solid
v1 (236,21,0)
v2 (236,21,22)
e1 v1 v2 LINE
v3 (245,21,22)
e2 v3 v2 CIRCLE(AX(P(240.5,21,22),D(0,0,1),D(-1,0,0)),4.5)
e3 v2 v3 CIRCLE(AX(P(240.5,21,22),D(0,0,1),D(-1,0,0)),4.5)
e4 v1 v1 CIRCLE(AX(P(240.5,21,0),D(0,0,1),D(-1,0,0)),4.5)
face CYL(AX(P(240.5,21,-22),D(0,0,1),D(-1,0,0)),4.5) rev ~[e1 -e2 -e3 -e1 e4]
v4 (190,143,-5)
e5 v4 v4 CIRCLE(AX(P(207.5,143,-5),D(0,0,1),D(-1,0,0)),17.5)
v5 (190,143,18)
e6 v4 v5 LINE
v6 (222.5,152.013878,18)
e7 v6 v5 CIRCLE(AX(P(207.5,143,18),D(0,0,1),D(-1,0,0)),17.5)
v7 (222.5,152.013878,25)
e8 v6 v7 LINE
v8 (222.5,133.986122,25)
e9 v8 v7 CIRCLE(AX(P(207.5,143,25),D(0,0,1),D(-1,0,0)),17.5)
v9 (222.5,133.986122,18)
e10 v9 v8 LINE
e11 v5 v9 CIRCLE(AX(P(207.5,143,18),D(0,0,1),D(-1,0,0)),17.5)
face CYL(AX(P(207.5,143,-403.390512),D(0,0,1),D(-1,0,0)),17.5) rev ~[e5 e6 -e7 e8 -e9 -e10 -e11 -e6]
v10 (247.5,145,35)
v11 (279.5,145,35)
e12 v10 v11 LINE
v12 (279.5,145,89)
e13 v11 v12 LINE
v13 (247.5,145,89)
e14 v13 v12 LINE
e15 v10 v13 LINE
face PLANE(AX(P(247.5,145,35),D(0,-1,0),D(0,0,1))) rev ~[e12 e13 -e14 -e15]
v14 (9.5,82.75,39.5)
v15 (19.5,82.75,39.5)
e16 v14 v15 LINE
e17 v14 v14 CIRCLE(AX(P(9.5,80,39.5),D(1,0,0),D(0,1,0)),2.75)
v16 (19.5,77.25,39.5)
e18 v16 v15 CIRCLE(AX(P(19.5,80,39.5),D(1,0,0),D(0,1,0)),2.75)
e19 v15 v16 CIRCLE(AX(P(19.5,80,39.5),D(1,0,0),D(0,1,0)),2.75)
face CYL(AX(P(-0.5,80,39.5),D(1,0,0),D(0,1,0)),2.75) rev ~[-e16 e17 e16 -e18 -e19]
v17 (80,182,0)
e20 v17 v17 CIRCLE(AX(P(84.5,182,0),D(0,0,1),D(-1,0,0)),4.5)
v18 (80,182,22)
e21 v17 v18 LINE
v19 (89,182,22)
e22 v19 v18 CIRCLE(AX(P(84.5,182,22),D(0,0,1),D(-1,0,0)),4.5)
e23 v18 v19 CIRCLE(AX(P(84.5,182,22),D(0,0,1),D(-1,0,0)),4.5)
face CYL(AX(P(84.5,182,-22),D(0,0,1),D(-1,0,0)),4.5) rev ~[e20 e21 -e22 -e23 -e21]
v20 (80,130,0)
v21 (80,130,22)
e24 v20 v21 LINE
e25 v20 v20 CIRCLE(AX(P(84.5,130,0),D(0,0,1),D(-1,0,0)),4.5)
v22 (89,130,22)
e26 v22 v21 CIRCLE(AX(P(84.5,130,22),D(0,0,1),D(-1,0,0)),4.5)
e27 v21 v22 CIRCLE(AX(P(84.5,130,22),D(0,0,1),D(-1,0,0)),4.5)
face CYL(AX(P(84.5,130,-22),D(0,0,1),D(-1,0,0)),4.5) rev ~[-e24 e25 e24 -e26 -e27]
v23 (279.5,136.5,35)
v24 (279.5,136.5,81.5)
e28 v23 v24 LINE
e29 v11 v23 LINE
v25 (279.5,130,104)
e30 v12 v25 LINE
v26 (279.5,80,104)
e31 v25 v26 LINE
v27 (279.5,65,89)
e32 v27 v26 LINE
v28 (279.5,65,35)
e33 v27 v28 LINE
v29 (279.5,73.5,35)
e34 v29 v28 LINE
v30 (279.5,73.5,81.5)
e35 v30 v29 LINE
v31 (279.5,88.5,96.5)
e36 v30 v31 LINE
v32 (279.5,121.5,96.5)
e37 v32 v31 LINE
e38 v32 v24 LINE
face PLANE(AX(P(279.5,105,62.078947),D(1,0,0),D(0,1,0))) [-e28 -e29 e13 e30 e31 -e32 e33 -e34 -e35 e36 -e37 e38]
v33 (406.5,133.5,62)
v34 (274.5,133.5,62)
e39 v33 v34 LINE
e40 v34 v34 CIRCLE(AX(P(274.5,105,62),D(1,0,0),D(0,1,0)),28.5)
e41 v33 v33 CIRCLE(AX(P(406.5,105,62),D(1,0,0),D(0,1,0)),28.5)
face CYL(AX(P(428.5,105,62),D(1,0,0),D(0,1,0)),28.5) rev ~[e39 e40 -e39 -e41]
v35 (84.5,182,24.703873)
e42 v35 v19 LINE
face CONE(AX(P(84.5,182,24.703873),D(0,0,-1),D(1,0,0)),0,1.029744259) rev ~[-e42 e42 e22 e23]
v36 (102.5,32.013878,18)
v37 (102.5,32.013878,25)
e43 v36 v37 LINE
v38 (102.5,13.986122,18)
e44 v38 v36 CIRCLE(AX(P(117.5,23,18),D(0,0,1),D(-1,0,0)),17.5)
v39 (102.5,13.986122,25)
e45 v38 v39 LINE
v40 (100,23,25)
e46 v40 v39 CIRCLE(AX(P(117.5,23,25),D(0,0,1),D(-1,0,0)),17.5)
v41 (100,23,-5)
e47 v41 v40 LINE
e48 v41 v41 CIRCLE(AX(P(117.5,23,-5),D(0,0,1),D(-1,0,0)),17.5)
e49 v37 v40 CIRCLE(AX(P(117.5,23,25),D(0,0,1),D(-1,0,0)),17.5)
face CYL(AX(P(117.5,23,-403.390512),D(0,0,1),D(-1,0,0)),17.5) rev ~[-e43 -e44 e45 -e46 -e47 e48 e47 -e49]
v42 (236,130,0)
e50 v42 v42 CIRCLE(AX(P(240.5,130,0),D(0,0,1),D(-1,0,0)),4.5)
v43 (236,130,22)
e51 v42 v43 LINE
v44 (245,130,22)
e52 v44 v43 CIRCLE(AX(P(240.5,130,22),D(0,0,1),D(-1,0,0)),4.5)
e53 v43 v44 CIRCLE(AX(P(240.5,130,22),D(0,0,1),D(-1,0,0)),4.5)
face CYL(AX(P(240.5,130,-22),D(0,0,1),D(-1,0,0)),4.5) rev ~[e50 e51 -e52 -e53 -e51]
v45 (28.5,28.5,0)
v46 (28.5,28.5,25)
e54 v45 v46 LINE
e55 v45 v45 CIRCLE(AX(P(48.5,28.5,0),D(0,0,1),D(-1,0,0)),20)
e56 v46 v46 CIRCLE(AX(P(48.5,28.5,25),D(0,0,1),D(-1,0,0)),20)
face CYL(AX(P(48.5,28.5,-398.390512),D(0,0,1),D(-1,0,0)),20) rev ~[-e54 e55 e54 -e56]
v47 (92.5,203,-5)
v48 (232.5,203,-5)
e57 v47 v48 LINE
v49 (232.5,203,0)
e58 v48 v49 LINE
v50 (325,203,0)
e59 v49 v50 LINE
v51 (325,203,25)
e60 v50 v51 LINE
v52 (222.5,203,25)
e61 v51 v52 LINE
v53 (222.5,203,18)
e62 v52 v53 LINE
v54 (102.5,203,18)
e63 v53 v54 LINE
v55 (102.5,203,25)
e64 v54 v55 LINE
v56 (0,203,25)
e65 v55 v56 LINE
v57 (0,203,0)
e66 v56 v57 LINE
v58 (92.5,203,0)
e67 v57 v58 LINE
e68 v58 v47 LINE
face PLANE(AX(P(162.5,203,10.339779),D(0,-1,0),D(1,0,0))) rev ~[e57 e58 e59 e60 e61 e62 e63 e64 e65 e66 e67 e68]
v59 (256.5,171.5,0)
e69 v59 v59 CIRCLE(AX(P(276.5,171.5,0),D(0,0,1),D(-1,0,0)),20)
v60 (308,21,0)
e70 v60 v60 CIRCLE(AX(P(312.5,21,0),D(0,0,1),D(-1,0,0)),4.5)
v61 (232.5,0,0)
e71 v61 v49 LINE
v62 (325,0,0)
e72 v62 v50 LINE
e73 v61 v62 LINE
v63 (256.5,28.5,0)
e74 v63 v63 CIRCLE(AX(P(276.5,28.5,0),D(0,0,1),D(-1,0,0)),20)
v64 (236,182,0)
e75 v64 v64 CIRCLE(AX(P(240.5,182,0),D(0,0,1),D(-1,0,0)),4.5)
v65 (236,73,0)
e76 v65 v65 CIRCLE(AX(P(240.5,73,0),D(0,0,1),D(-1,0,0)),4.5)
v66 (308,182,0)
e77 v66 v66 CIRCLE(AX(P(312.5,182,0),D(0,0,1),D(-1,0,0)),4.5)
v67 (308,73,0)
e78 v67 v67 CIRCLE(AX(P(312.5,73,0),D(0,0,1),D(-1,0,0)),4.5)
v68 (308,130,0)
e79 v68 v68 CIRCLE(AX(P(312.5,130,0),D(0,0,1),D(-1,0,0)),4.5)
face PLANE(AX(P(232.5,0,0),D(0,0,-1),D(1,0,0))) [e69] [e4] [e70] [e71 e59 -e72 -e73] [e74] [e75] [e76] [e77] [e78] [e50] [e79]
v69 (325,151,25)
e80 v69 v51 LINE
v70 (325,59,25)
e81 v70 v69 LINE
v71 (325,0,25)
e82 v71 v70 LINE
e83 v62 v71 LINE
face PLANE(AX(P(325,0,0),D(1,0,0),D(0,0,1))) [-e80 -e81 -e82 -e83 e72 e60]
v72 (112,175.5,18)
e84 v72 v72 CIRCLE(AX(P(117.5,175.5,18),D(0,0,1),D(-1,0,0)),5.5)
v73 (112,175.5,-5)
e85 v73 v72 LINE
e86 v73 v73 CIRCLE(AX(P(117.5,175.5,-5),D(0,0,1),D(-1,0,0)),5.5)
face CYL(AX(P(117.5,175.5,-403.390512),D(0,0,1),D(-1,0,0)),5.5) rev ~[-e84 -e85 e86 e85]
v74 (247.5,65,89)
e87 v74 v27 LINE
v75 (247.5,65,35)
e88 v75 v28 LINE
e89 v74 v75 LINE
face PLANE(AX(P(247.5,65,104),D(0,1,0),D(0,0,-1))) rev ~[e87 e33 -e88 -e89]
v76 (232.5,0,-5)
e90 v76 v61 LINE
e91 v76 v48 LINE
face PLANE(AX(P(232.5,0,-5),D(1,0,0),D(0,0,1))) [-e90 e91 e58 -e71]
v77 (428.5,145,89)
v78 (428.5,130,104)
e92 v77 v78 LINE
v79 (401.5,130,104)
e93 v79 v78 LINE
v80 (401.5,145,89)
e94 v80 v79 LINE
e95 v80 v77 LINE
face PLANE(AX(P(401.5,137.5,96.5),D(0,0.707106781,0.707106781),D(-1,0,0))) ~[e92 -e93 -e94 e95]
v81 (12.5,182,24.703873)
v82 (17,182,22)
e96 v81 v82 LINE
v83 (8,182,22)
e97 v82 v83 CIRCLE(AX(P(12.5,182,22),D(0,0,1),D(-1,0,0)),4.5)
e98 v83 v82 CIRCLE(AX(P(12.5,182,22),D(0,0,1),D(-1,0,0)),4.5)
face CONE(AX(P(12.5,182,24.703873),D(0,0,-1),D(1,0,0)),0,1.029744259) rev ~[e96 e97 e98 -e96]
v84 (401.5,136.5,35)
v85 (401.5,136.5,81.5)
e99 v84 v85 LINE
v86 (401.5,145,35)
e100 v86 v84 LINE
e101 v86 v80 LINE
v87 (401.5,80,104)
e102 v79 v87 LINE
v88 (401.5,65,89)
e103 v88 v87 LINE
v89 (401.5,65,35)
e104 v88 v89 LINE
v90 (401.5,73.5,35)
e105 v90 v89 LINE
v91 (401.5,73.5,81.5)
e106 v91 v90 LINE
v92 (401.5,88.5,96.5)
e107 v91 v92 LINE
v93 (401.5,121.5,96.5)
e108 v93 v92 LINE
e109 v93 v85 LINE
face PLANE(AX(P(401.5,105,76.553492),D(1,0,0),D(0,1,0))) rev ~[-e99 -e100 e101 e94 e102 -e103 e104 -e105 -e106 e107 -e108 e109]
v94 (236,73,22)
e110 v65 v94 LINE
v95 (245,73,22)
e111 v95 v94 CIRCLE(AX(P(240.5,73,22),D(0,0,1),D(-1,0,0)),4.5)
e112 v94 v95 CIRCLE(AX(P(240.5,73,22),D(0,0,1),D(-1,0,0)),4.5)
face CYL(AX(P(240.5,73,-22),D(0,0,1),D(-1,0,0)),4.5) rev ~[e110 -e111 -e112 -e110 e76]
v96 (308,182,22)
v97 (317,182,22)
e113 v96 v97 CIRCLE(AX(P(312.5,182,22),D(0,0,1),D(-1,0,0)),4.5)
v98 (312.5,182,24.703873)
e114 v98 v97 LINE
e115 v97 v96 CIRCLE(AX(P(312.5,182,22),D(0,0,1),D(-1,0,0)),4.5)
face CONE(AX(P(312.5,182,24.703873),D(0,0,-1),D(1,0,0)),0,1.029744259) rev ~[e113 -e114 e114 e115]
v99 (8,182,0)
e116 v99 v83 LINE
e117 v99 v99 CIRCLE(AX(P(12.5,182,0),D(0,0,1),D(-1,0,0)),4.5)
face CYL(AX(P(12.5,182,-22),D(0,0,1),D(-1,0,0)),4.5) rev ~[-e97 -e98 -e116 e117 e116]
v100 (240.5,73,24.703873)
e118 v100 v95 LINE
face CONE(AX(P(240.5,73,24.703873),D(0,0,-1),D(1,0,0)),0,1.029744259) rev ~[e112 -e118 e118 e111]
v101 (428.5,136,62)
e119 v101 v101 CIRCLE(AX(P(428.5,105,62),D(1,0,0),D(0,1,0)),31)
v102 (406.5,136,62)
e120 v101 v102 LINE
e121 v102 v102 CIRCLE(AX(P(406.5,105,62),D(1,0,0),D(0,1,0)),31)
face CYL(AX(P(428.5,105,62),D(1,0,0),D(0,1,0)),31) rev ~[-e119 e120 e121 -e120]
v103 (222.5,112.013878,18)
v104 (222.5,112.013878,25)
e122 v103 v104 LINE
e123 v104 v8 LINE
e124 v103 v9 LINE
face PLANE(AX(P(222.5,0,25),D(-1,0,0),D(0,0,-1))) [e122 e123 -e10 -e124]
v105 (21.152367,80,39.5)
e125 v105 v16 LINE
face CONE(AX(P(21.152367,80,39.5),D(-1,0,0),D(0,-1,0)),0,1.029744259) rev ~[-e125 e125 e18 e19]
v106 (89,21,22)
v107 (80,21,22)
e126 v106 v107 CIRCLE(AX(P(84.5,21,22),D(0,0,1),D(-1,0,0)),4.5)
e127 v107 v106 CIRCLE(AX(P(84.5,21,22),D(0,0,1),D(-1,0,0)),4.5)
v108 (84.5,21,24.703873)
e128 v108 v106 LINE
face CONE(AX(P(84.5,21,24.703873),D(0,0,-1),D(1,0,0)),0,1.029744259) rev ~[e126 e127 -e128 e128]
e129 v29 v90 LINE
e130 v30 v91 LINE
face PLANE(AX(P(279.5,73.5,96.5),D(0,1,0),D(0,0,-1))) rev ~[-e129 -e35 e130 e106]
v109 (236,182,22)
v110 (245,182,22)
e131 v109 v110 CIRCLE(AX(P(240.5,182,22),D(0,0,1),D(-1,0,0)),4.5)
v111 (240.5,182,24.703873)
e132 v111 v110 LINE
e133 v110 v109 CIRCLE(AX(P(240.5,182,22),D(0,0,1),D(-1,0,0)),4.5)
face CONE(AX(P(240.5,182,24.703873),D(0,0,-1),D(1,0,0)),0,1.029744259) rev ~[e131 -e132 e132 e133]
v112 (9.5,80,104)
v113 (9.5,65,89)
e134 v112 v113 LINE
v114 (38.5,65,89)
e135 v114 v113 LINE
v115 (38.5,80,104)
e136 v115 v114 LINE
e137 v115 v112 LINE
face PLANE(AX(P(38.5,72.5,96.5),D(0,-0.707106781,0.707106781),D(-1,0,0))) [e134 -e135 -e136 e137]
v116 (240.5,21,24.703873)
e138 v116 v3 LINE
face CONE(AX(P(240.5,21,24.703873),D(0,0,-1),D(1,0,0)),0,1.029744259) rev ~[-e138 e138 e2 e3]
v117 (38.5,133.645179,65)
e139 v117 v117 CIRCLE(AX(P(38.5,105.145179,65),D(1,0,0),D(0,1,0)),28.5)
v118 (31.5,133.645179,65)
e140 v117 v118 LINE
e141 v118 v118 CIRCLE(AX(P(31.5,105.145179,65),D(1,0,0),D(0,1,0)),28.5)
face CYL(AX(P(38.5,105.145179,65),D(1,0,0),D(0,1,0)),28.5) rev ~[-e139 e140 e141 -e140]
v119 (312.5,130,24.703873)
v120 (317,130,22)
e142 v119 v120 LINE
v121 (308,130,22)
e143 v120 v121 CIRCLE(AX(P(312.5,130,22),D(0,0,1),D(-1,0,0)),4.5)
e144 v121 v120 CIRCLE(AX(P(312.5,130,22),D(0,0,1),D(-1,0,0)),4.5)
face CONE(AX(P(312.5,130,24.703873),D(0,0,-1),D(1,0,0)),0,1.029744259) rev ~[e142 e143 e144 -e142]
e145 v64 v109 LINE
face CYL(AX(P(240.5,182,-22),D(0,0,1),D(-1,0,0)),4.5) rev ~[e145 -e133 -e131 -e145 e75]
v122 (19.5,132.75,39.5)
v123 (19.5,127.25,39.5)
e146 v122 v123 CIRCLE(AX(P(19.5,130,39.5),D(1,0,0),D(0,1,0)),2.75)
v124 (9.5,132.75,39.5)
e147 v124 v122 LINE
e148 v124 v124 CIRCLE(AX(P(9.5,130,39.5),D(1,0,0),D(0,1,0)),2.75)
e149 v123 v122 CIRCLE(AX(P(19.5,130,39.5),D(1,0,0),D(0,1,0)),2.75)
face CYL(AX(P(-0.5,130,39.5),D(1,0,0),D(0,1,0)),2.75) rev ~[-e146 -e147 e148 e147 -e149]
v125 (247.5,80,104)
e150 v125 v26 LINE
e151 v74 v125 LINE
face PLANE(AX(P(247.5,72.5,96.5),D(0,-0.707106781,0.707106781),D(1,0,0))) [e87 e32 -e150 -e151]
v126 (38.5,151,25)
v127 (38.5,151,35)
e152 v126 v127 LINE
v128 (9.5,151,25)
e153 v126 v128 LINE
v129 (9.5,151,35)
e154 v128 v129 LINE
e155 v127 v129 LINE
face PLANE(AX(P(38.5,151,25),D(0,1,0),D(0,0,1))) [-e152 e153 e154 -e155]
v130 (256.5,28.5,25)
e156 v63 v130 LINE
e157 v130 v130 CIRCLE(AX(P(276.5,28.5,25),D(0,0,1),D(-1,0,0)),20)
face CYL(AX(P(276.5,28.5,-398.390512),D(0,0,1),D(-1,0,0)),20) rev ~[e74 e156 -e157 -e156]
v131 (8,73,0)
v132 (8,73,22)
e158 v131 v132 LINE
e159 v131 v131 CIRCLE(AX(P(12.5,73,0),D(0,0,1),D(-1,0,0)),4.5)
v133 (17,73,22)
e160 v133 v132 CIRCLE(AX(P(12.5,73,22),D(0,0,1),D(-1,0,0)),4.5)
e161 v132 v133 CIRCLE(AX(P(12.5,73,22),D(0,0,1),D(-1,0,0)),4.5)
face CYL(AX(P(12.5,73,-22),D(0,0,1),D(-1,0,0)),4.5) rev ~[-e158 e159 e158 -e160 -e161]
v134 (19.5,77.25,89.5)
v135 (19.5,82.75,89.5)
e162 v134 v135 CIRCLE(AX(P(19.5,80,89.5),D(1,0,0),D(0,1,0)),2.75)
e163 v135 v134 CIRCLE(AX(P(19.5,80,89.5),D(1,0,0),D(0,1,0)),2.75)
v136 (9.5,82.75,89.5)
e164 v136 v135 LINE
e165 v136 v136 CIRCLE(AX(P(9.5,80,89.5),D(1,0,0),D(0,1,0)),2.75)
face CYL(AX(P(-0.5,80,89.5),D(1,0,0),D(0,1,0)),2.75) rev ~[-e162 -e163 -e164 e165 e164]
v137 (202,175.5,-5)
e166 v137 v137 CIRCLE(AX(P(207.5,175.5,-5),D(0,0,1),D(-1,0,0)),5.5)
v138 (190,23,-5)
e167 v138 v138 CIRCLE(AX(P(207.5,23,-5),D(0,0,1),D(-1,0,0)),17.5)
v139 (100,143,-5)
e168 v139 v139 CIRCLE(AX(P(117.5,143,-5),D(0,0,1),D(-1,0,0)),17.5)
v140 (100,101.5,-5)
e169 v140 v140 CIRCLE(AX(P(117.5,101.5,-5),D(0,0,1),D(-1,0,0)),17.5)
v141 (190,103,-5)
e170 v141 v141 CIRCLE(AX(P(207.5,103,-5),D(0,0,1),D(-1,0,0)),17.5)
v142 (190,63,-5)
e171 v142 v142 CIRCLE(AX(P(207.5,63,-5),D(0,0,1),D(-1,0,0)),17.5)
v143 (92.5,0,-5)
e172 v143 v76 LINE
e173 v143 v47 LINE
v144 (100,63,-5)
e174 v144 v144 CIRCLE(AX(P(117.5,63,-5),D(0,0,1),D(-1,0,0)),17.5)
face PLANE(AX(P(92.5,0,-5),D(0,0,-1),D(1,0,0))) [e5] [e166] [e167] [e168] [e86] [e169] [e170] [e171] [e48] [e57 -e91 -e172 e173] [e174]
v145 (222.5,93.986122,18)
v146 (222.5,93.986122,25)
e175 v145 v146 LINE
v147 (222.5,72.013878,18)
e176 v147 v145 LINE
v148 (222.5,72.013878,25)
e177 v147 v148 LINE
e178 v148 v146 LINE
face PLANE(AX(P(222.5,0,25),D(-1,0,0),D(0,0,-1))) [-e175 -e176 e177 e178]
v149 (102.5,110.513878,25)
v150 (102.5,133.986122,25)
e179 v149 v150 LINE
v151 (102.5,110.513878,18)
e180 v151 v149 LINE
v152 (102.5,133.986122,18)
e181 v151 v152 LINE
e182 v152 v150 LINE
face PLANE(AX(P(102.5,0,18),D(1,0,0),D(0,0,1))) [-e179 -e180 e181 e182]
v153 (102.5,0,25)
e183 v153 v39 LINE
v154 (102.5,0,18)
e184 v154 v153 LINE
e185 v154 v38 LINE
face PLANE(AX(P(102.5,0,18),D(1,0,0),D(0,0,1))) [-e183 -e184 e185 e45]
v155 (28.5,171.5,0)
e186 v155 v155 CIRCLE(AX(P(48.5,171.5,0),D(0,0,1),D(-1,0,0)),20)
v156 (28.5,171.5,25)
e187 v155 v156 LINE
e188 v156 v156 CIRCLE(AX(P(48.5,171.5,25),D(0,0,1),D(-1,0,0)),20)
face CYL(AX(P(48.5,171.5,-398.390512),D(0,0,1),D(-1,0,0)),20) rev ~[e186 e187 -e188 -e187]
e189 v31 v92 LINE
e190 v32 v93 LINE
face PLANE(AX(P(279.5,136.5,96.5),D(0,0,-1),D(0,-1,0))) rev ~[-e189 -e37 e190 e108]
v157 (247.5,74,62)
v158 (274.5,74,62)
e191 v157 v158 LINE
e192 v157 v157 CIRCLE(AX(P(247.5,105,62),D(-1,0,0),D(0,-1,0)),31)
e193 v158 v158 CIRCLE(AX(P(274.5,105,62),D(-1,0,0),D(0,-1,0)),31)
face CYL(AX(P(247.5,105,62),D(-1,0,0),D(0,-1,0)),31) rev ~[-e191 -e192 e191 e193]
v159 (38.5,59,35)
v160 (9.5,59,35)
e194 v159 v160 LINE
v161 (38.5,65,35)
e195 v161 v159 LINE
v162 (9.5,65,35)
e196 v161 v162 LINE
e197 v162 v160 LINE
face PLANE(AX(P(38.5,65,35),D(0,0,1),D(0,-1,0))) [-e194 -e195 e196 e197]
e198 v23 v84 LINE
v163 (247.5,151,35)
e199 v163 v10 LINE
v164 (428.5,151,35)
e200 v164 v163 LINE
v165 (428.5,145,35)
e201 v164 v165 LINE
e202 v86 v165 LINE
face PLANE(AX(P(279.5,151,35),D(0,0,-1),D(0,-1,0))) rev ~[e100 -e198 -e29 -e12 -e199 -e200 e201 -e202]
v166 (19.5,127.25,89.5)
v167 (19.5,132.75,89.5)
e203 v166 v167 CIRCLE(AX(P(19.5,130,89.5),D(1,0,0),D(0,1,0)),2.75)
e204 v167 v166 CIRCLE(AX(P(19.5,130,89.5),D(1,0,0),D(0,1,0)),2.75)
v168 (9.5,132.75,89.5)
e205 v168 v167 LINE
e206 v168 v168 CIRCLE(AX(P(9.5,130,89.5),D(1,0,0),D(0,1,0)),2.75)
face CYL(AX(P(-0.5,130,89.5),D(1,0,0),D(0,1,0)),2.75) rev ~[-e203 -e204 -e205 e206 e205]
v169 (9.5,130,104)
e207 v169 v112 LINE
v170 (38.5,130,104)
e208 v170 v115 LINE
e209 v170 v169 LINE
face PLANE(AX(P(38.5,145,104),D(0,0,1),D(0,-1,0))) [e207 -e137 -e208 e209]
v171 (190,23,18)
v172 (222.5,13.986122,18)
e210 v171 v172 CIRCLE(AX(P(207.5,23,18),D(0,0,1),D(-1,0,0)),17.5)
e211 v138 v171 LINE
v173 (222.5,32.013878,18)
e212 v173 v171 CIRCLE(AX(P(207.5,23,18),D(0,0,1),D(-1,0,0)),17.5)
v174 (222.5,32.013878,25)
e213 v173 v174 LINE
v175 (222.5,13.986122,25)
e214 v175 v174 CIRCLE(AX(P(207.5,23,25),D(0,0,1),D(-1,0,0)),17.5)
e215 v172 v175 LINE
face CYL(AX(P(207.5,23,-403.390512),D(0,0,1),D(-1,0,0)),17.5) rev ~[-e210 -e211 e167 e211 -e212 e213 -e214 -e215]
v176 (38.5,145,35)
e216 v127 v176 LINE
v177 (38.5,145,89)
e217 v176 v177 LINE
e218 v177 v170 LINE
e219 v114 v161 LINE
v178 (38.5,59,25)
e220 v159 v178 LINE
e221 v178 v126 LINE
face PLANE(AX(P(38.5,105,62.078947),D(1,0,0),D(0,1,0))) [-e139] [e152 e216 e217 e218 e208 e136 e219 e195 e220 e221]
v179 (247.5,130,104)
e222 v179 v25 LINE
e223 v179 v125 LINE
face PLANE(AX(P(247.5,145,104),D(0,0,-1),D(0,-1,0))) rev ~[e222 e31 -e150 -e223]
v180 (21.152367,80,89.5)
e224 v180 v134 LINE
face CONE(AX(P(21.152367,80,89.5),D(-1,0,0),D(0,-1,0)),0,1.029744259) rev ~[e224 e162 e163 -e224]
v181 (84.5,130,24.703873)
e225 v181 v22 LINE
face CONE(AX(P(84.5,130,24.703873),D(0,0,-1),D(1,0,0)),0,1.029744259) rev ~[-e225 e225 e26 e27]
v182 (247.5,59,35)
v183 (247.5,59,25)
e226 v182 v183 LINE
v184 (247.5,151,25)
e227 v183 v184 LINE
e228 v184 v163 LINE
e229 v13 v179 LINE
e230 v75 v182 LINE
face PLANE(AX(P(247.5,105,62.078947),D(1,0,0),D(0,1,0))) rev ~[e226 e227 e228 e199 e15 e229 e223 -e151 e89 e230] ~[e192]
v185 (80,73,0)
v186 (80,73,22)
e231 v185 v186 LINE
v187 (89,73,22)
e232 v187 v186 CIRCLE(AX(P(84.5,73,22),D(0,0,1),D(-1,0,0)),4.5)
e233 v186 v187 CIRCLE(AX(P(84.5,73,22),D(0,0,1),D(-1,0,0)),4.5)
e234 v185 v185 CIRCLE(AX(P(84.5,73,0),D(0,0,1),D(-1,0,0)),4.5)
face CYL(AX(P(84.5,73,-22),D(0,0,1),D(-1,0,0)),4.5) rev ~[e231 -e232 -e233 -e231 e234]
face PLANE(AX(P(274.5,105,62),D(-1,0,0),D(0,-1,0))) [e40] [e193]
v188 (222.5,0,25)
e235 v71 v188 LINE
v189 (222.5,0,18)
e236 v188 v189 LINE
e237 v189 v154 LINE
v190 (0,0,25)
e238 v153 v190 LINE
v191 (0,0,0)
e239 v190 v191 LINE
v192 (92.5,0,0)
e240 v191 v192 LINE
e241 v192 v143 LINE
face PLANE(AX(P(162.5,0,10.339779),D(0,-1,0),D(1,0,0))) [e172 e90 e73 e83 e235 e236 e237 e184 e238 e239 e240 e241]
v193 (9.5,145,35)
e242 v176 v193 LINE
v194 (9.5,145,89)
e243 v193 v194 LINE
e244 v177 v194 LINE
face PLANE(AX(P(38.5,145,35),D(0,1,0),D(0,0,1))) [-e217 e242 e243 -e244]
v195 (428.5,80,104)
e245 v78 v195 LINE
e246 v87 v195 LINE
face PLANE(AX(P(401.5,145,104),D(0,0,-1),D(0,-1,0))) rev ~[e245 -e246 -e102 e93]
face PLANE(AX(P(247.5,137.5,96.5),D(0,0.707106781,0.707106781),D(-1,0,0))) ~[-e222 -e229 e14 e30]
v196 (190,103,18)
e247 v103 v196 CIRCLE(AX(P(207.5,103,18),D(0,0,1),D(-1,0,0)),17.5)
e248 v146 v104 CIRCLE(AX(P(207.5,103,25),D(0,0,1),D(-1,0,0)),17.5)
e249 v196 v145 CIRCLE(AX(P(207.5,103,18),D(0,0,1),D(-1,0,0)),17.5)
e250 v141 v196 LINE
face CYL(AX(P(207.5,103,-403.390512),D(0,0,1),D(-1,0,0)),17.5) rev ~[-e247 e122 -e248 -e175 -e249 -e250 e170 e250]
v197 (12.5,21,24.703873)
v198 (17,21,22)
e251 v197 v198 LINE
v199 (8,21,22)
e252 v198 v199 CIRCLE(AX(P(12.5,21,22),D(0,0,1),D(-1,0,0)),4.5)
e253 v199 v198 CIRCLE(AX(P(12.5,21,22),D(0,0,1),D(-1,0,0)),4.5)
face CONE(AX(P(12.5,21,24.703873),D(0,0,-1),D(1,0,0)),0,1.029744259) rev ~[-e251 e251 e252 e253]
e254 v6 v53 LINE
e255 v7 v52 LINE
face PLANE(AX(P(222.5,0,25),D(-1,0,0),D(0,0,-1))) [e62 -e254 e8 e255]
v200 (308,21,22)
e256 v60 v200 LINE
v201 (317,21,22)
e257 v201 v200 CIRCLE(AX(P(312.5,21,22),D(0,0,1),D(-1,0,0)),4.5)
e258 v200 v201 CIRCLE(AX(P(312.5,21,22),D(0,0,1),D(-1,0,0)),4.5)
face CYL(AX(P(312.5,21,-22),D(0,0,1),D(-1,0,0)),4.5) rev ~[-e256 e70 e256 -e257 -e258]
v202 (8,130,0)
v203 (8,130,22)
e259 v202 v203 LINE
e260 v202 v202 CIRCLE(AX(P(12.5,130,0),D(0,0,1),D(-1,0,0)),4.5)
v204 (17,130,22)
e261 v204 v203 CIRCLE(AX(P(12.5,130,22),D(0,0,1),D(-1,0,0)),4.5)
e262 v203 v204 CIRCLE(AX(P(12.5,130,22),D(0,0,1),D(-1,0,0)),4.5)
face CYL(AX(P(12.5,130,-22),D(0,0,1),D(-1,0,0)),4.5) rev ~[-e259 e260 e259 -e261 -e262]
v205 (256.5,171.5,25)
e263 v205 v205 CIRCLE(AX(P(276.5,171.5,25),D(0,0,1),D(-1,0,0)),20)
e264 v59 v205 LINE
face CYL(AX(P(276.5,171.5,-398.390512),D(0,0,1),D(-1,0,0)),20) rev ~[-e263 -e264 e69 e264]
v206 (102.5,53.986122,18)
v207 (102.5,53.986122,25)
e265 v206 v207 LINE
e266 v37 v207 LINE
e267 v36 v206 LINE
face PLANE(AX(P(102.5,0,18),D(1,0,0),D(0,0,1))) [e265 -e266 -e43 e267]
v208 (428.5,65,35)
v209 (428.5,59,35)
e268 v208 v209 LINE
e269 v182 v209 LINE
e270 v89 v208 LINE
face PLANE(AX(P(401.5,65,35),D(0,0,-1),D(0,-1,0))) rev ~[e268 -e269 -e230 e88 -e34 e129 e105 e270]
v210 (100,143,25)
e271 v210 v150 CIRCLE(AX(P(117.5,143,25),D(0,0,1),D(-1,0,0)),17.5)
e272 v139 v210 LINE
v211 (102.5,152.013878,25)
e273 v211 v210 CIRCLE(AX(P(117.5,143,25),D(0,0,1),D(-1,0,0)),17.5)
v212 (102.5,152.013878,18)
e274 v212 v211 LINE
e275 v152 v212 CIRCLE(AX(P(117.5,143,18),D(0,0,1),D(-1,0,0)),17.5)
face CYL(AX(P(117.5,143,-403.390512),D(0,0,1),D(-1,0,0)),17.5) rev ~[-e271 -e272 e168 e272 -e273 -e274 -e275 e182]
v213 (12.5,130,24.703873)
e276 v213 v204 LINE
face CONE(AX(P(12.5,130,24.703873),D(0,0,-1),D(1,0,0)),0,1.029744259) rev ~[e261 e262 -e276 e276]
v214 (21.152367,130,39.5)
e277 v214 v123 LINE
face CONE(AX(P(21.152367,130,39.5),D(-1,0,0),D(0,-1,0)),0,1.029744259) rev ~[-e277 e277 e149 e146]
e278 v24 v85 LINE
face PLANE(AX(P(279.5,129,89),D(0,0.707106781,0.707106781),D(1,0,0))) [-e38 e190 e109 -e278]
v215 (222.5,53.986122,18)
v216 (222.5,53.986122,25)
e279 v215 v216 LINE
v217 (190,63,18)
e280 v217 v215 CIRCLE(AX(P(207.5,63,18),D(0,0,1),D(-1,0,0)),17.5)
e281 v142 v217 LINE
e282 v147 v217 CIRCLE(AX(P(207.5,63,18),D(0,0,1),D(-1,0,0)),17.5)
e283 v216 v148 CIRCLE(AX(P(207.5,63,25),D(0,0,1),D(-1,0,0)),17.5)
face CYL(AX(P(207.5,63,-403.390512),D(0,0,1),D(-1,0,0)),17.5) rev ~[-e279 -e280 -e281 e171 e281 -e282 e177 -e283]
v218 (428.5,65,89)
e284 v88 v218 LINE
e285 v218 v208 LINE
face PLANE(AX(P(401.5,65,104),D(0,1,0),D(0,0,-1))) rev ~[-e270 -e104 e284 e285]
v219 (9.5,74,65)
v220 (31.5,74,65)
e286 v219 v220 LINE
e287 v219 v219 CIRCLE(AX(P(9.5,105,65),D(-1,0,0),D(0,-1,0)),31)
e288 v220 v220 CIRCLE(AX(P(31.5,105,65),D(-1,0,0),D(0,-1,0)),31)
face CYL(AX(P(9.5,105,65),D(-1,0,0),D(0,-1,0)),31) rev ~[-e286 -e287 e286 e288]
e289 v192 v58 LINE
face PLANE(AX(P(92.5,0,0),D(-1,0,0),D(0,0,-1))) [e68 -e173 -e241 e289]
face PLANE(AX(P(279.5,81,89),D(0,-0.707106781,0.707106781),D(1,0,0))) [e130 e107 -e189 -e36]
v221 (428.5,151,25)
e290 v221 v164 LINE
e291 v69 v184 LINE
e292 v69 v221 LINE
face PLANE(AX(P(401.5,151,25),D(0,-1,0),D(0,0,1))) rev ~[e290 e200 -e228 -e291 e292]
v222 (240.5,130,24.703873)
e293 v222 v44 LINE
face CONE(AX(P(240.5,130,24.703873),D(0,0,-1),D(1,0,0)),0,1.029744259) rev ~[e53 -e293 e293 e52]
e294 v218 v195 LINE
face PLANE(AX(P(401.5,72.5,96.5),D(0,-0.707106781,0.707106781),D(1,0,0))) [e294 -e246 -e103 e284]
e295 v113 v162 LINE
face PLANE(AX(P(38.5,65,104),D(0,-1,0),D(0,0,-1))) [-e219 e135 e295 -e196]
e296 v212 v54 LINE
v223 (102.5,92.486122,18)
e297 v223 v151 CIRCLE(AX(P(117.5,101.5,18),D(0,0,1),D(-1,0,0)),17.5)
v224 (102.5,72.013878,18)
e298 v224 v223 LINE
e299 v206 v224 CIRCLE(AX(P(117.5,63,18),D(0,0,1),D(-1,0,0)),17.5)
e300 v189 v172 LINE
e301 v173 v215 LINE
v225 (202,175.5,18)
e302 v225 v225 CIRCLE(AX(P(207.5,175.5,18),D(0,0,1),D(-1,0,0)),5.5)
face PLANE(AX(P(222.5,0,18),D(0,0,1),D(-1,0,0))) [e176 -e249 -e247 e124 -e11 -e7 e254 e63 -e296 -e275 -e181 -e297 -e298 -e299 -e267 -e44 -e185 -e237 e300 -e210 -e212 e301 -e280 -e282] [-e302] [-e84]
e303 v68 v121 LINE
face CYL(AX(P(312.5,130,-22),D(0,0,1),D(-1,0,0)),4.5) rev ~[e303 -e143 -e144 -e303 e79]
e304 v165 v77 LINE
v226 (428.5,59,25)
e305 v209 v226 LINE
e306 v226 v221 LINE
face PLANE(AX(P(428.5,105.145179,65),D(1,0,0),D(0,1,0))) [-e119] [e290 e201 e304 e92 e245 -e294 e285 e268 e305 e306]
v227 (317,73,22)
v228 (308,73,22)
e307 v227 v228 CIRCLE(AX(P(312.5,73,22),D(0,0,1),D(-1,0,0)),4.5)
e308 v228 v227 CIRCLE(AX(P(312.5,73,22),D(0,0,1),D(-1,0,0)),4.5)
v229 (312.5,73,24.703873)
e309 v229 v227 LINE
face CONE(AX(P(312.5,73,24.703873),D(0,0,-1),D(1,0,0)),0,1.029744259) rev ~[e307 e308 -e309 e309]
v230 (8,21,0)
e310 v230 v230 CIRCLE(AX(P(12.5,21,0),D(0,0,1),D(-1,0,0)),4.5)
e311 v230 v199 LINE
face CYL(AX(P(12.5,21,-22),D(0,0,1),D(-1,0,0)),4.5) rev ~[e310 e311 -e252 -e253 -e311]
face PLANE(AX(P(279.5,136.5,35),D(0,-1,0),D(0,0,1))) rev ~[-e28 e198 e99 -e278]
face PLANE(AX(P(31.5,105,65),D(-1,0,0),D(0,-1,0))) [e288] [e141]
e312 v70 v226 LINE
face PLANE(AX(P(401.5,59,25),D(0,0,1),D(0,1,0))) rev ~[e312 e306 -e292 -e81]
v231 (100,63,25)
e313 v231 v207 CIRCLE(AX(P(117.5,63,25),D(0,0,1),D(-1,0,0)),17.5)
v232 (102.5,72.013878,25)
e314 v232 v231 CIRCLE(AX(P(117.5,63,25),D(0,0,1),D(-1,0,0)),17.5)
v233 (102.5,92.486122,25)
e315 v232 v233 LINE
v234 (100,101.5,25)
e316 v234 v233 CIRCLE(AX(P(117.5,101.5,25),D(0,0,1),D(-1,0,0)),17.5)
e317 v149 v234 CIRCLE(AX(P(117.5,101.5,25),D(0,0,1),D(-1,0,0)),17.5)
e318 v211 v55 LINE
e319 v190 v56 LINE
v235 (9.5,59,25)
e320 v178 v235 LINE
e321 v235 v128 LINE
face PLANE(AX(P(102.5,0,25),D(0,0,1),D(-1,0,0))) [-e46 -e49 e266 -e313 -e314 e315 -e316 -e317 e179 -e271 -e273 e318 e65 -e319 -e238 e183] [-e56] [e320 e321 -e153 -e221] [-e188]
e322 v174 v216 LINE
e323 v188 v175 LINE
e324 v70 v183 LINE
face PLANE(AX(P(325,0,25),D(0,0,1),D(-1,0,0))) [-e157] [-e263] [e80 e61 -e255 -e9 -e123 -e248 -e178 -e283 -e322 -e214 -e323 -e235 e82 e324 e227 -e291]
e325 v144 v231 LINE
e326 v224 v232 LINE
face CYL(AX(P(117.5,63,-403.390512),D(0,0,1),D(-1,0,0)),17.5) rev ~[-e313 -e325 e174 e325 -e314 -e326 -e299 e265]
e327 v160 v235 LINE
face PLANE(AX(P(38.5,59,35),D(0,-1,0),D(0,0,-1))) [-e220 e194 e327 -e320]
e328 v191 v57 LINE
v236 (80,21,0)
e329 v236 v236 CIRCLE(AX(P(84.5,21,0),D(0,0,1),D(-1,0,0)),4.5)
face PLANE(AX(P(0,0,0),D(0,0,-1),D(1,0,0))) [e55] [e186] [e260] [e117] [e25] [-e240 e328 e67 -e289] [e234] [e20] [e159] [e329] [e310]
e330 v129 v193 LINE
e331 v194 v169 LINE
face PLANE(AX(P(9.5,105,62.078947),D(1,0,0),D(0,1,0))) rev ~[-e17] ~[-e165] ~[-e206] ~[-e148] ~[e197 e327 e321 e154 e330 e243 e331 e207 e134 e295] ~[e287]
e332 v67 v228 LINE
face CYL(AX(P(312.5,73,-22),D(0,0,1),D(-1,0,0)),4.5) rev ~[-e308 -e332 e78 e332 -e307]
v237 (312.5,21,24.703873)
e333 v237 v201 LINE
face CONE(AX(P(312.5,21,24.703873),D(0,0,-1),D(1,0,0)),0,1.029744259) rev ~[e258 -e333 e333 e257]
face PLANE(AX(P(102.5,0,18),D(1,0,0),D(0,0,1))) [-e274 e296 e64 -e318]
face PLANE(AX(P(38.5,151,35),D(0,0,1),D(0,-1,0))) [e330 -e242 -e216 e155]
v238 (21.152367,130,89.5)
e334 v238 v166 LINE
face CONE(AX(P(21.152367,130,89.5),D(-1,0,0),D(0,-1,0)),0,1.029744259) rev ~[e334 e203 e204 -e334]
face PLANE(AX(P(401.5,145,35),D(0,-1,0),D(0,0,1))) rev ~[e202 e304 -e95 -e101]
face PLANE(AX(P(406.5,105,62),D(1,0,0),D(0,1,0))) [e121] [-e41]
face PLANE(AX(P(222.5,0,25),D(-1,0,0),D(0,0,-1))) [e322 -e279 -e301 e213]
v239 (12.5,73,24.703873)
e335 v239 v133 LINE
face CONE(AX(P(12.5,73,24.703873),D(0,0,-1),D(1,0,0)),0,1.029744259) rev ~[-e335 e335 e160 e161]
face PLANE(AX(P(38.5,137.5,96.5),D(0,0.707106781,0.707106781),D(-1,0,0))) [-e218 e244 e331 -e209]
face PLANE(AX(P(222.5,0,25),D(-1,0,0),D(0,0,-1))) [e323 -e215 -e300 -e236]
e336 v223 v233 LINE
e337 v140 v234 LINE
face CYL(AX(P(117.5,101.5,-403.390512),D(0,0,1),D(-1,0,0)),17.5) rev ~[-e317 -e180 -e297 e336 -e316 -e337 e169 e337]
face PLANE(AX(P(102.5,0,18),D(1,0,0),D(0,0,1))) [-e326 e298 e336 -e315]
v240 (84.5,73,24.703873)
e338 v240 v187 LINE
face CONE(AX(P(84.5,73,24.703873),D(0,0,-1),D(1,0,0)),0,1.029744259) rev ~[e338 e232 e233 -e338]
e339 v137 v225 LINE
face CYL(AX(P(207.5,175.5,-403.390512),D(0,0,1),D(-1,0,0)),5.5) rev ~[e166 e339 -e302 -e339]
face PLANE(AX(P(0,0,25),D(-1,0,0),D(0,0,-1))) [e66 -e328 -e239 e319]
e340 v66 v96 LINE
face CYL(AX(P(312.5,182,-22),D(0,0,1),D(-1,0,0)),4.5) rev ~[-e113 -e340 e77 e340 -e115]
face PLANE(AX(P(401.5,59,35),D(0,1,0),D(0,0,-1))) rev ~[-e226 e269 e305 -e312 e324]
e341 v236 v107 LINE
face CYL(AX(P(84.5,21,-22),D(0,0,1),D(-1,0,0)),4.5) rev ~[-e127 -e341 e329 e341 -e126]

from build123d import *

# Parameters (mm, degrees)
F1_DEPTH  = 203
F4_DEPTH  = 29
F5_SIZE   = 15
F6_R      = 28.5
F7_DEPTH  = 7
F8_R      = 31
F9_DEPTH  = 22
F11_D     = 9
F11_DEPTH = 22
F11_TIP   = 2.7038727856
F12_D     = 40
F14_D     = 35
F15_D     = 11
F18_R     = 31
F19_DEPTH = 32
F20_SIZE  = 15
F21_R     = 31
F22_DEPTH = 122
F23_SIZE  = 15
F24_R     = 31
F25_DEPTH = 27
F26_SIZE  = 15
F28_D     = 5.5
F28_DEPTH = 10
F28_TIP   = 1.6523667023
F29_R     = 31
F30_DEPTH = 181
F31_R     = 31
F32_DEPTH = 5
F33_DEPTH = 27
F34_R     = 28.5
F35_DEPTH = 154
F36_R     = 31
F36_R_2   = 28.5
F37_DEPTH = 22


with BuildPart() as f1:
    # F0 (on Front) → F1 (new body)
    with BuildSketch(Plane.XZ):
        Polygon((0, 25), (0, 0), (92.5, 0), (92.5, -5), (232.5, -5), (232.5, 0), (325, 0), (325, 25), (222.5, 25), (222.5, 18), (102.5, 18), (102.5, 25), align=None)
    extrude(amount=-F1_DEPTH)

    # F3 (on offset) → F4 (join)
    with BuildSketch(Plane.YZ.offset(38.5)):
        Polygon((59, 25), (151, 25), (151, 35), (145, 35), (145, 104), (65, 104), (65, 35), (59, 35), align=None)
    extrude(amount=-F4_DEPTH)

    # F5
    f5_edges = [f1.edges().sort_by_distance(p)[0] for p in [
        (24, 65, 104),
        (24, 145, 104),
    ]]
    chamfer(f5_edges, length=F5_SIZE)

    # F6 (on face) → F7 (cut)
    with BuildSketch(Plane.YZ.offset(38.5)):
        with Locations((105.1451787353, 65)):
            Circle(F6_R)
    extrude(amount=-F7_DEPTH, mode=Mode.SUBTRACT)

    # F8 (on face) → F9 (cut)
    with BuildSketch(Plane(origin=(9.5, 0, 0), x_dir=(0, -1, 0), z_dir=(-1, 0, 0))):
        with Locations((-105, 65)):
            Circle(F8_R)
    extrude(amount=-F9_DEPTH, mode=Mode.SUBTRACT)

    # F11
    with Locations(Plane(origin=(0, 0, 0), x_dir=(1, 0, 0), z_dir=(0, 0, -1))):
        with Locations((12.5, -182), (12.5, -130), (12.5, -73), (12.5, -21), (84.5, -73), (84.5, -130), (84.5, -182), (240.5, -182), (312.5, -182), (240.5, -130), (312.5, -130), (240.5, -73), (312.5, -73), (240.5, -21), (312.5, -21), (84.5, -21)):
            Hole(F11_D / 2, depth=F11_DEPTH)
            with Locations((0, 0, -(F11_DEPTH + F11_TIP / 2))):  # 118° drill point
                Cone(0, F11_D / 2, F11_TIP, mode=Mode.SUBTRACT)

    # F12 (through all)
    with Locations(Plane(origin=(0, 0, 0), x_dir=(1, 0, 0), z_dir=(0, 0, -1))):
        with Locations((48.5, -28.5), (48.5, -171.5), (276.5, -28.5), (276.5, -171.5)):
            Hole(F12_D / 2)

    # F14 (through all)
    with Locations(Plane(origin=(0, 0, -5), x_dir=(1, 0, 0), z_dir=(0, 0, -1))):
        with Locations((117.5, -23), (117.5, -63), (117.5, -143), (207.5, -143), (207.5, -103), (117.5, -101.5), (207.5, -63), (207.5, -23)):
            Hole(F14_D / 2)

    # F15 (through all)
    with Locations(Plane(origin=(0, 0, -5), x_dir=(1, 0, 0), z_dir=(0, 0, -1))):
        with Locations((117.5, -175.5), (207.5, -175.5)):
            Hole(F15_D / 2)

    # F18 (on offset) → F19 (join)
    with BuildSketch(Plane.YZ.offset(247.5)):
        Polygon((59, 25), (151, 25), (151, 35), (145, 35), (145, 104), (65, 104), (65, 35), (59, 35), align=None)
        with Locations((105.1451787353, 65)):
            Circle(F18_R, mode=Mode.SUBTRACT)
    extrude(amount=F19_DEPTH)

    # F20
    f20_edges = [f1.edges().sort_by_distance(p)[0] for p in [
        (263.5, 65, 104),
        (263.5, 145, 104),
    ]]
    chamfer(f20_edges, length=F20_SIZE)

    # F21 (on face) → F22 (join)
    with BuildSketch(Plane.YZ.offset(279.5)):
        Polygon((151, 35), (145, 35), (136.5, 35), (136.5, 96.5), (73.5, 96.5), (73.5, 35), (65, 35), (59, 35), (59, 25), (151, 25), align=None)
        with Locations((105.1451787353, 65)):
            Circle(F21_R, mode=Mode.SUBTRACT)
    extrude(amount=F22_DEPTH)

    # F23
    f23_edges = [f1.edges().sort_by_distance(p)[0] for p in [
        (340.5, 73.5, 96.5),
        (340.5, 136.5, 96.5),
    ]]
    chamfer(f23_edges, length=F23_SIZE)

    # F24 (on face) → F25 (join)
    with BuildSketch(Plane.YZ.offset(401.5)):
        Polygon((65, 104), (65, 35), (73.5, 35), (73.5, 81.5), (88.5, 96.5), (121.5, 96.5), (136.5, 81.5), (136.5, 35), (145, 35), (145, 104), align=None)
        Polygon((59, 35), (59, 25), (151, 25), (151, 35), (145, 35), (136.5, 35), (136.5, 81.5), (121.5, 96.5), (88.5, 96.5), (73.5, 81.5), (73.5, 35), (65, 35), align=None)
        with Locations((105.1451787353, 65)):
            Circle(F24_R, mode=Mode.SUBTRACT)
    extrude(amount=F25_DEPTH)

    # F26
    f26_edges = [f1.edges().sort_by_distance(p)[0] for p in [
        (415, 65, 104),
        (415, 145, 104),
    ]]
    chamfer(f26_edges, length=F26_SIZE)

    # F28
    with Locations(Plane(origin=(9.5, 0, 0), x_dir=(0, -1, 0), z_dir=(-1, 0, 0))):
        with Locations((-130, 89.5), (-80, 89.5), (-130, 39.5), (-80, 39.5)):
            Hole(F28_D / 2, depth=F28_DEPTH)
            with Locations((0, 0, -(F28_DEPTH + F28_TIP / 2))):  # 118° drill point
                Cone(0, F28_D / 2, F28_TIP, mode=Mode.SUBTRACT)

    # F29 (on face) → F30 (join)
    with BuildSketch(Plane.YZ.offset(428.5)):
        with Locations((105.1451787353, 65)):
            Circle(F29_R)
    extrude(amount=-F30_DEPTH)

    # F31 (on face) → F32 (join)
    with BuildSketch(Plane(origin=(247.5, 0, 0), x_dir=(0, -1, 0), z_dir=(-1, 0, 0))):
        with Locations((-105, 62)):
            Circle(F31_R)
    extrude(amount=-F32_DEPTH)

    # F31 (on face) → F33 (cut)
    with BuildSketch(Plane(origin=(247.5, 0, 0), x_dir=(0, -1, 0), z_dir=(-1, 0, 0))):
        with Locations((-105, 62)):
            Circle(F31_R)
    extrude(amount=-F33_DEPTH, mode=Mode.SUBTRACT)

    # F34 (on face) → F35 (cut)
    with BuildSketch(Plane.YZ.offset(428.5)):
        with Locations((105, 62)):
            Circle(F34_R)
    extrude(amount=-F35_DEPTH, mode=Mode.SUBTRACT)

    # F36 (on face) → F37 (cut)
    with BuildSketch(Plane.YZ.offset(428.5)):
        with Locations((105, 62)):
            Circle(F36_R)
        with Locations((105, 62)):
            Circle(F36_R_2, mode=Mode.SUBTRACT)
    extrude(amount=-F37_DEPTH, mode=Mode.SUBTRACT)


solid = f1.part
